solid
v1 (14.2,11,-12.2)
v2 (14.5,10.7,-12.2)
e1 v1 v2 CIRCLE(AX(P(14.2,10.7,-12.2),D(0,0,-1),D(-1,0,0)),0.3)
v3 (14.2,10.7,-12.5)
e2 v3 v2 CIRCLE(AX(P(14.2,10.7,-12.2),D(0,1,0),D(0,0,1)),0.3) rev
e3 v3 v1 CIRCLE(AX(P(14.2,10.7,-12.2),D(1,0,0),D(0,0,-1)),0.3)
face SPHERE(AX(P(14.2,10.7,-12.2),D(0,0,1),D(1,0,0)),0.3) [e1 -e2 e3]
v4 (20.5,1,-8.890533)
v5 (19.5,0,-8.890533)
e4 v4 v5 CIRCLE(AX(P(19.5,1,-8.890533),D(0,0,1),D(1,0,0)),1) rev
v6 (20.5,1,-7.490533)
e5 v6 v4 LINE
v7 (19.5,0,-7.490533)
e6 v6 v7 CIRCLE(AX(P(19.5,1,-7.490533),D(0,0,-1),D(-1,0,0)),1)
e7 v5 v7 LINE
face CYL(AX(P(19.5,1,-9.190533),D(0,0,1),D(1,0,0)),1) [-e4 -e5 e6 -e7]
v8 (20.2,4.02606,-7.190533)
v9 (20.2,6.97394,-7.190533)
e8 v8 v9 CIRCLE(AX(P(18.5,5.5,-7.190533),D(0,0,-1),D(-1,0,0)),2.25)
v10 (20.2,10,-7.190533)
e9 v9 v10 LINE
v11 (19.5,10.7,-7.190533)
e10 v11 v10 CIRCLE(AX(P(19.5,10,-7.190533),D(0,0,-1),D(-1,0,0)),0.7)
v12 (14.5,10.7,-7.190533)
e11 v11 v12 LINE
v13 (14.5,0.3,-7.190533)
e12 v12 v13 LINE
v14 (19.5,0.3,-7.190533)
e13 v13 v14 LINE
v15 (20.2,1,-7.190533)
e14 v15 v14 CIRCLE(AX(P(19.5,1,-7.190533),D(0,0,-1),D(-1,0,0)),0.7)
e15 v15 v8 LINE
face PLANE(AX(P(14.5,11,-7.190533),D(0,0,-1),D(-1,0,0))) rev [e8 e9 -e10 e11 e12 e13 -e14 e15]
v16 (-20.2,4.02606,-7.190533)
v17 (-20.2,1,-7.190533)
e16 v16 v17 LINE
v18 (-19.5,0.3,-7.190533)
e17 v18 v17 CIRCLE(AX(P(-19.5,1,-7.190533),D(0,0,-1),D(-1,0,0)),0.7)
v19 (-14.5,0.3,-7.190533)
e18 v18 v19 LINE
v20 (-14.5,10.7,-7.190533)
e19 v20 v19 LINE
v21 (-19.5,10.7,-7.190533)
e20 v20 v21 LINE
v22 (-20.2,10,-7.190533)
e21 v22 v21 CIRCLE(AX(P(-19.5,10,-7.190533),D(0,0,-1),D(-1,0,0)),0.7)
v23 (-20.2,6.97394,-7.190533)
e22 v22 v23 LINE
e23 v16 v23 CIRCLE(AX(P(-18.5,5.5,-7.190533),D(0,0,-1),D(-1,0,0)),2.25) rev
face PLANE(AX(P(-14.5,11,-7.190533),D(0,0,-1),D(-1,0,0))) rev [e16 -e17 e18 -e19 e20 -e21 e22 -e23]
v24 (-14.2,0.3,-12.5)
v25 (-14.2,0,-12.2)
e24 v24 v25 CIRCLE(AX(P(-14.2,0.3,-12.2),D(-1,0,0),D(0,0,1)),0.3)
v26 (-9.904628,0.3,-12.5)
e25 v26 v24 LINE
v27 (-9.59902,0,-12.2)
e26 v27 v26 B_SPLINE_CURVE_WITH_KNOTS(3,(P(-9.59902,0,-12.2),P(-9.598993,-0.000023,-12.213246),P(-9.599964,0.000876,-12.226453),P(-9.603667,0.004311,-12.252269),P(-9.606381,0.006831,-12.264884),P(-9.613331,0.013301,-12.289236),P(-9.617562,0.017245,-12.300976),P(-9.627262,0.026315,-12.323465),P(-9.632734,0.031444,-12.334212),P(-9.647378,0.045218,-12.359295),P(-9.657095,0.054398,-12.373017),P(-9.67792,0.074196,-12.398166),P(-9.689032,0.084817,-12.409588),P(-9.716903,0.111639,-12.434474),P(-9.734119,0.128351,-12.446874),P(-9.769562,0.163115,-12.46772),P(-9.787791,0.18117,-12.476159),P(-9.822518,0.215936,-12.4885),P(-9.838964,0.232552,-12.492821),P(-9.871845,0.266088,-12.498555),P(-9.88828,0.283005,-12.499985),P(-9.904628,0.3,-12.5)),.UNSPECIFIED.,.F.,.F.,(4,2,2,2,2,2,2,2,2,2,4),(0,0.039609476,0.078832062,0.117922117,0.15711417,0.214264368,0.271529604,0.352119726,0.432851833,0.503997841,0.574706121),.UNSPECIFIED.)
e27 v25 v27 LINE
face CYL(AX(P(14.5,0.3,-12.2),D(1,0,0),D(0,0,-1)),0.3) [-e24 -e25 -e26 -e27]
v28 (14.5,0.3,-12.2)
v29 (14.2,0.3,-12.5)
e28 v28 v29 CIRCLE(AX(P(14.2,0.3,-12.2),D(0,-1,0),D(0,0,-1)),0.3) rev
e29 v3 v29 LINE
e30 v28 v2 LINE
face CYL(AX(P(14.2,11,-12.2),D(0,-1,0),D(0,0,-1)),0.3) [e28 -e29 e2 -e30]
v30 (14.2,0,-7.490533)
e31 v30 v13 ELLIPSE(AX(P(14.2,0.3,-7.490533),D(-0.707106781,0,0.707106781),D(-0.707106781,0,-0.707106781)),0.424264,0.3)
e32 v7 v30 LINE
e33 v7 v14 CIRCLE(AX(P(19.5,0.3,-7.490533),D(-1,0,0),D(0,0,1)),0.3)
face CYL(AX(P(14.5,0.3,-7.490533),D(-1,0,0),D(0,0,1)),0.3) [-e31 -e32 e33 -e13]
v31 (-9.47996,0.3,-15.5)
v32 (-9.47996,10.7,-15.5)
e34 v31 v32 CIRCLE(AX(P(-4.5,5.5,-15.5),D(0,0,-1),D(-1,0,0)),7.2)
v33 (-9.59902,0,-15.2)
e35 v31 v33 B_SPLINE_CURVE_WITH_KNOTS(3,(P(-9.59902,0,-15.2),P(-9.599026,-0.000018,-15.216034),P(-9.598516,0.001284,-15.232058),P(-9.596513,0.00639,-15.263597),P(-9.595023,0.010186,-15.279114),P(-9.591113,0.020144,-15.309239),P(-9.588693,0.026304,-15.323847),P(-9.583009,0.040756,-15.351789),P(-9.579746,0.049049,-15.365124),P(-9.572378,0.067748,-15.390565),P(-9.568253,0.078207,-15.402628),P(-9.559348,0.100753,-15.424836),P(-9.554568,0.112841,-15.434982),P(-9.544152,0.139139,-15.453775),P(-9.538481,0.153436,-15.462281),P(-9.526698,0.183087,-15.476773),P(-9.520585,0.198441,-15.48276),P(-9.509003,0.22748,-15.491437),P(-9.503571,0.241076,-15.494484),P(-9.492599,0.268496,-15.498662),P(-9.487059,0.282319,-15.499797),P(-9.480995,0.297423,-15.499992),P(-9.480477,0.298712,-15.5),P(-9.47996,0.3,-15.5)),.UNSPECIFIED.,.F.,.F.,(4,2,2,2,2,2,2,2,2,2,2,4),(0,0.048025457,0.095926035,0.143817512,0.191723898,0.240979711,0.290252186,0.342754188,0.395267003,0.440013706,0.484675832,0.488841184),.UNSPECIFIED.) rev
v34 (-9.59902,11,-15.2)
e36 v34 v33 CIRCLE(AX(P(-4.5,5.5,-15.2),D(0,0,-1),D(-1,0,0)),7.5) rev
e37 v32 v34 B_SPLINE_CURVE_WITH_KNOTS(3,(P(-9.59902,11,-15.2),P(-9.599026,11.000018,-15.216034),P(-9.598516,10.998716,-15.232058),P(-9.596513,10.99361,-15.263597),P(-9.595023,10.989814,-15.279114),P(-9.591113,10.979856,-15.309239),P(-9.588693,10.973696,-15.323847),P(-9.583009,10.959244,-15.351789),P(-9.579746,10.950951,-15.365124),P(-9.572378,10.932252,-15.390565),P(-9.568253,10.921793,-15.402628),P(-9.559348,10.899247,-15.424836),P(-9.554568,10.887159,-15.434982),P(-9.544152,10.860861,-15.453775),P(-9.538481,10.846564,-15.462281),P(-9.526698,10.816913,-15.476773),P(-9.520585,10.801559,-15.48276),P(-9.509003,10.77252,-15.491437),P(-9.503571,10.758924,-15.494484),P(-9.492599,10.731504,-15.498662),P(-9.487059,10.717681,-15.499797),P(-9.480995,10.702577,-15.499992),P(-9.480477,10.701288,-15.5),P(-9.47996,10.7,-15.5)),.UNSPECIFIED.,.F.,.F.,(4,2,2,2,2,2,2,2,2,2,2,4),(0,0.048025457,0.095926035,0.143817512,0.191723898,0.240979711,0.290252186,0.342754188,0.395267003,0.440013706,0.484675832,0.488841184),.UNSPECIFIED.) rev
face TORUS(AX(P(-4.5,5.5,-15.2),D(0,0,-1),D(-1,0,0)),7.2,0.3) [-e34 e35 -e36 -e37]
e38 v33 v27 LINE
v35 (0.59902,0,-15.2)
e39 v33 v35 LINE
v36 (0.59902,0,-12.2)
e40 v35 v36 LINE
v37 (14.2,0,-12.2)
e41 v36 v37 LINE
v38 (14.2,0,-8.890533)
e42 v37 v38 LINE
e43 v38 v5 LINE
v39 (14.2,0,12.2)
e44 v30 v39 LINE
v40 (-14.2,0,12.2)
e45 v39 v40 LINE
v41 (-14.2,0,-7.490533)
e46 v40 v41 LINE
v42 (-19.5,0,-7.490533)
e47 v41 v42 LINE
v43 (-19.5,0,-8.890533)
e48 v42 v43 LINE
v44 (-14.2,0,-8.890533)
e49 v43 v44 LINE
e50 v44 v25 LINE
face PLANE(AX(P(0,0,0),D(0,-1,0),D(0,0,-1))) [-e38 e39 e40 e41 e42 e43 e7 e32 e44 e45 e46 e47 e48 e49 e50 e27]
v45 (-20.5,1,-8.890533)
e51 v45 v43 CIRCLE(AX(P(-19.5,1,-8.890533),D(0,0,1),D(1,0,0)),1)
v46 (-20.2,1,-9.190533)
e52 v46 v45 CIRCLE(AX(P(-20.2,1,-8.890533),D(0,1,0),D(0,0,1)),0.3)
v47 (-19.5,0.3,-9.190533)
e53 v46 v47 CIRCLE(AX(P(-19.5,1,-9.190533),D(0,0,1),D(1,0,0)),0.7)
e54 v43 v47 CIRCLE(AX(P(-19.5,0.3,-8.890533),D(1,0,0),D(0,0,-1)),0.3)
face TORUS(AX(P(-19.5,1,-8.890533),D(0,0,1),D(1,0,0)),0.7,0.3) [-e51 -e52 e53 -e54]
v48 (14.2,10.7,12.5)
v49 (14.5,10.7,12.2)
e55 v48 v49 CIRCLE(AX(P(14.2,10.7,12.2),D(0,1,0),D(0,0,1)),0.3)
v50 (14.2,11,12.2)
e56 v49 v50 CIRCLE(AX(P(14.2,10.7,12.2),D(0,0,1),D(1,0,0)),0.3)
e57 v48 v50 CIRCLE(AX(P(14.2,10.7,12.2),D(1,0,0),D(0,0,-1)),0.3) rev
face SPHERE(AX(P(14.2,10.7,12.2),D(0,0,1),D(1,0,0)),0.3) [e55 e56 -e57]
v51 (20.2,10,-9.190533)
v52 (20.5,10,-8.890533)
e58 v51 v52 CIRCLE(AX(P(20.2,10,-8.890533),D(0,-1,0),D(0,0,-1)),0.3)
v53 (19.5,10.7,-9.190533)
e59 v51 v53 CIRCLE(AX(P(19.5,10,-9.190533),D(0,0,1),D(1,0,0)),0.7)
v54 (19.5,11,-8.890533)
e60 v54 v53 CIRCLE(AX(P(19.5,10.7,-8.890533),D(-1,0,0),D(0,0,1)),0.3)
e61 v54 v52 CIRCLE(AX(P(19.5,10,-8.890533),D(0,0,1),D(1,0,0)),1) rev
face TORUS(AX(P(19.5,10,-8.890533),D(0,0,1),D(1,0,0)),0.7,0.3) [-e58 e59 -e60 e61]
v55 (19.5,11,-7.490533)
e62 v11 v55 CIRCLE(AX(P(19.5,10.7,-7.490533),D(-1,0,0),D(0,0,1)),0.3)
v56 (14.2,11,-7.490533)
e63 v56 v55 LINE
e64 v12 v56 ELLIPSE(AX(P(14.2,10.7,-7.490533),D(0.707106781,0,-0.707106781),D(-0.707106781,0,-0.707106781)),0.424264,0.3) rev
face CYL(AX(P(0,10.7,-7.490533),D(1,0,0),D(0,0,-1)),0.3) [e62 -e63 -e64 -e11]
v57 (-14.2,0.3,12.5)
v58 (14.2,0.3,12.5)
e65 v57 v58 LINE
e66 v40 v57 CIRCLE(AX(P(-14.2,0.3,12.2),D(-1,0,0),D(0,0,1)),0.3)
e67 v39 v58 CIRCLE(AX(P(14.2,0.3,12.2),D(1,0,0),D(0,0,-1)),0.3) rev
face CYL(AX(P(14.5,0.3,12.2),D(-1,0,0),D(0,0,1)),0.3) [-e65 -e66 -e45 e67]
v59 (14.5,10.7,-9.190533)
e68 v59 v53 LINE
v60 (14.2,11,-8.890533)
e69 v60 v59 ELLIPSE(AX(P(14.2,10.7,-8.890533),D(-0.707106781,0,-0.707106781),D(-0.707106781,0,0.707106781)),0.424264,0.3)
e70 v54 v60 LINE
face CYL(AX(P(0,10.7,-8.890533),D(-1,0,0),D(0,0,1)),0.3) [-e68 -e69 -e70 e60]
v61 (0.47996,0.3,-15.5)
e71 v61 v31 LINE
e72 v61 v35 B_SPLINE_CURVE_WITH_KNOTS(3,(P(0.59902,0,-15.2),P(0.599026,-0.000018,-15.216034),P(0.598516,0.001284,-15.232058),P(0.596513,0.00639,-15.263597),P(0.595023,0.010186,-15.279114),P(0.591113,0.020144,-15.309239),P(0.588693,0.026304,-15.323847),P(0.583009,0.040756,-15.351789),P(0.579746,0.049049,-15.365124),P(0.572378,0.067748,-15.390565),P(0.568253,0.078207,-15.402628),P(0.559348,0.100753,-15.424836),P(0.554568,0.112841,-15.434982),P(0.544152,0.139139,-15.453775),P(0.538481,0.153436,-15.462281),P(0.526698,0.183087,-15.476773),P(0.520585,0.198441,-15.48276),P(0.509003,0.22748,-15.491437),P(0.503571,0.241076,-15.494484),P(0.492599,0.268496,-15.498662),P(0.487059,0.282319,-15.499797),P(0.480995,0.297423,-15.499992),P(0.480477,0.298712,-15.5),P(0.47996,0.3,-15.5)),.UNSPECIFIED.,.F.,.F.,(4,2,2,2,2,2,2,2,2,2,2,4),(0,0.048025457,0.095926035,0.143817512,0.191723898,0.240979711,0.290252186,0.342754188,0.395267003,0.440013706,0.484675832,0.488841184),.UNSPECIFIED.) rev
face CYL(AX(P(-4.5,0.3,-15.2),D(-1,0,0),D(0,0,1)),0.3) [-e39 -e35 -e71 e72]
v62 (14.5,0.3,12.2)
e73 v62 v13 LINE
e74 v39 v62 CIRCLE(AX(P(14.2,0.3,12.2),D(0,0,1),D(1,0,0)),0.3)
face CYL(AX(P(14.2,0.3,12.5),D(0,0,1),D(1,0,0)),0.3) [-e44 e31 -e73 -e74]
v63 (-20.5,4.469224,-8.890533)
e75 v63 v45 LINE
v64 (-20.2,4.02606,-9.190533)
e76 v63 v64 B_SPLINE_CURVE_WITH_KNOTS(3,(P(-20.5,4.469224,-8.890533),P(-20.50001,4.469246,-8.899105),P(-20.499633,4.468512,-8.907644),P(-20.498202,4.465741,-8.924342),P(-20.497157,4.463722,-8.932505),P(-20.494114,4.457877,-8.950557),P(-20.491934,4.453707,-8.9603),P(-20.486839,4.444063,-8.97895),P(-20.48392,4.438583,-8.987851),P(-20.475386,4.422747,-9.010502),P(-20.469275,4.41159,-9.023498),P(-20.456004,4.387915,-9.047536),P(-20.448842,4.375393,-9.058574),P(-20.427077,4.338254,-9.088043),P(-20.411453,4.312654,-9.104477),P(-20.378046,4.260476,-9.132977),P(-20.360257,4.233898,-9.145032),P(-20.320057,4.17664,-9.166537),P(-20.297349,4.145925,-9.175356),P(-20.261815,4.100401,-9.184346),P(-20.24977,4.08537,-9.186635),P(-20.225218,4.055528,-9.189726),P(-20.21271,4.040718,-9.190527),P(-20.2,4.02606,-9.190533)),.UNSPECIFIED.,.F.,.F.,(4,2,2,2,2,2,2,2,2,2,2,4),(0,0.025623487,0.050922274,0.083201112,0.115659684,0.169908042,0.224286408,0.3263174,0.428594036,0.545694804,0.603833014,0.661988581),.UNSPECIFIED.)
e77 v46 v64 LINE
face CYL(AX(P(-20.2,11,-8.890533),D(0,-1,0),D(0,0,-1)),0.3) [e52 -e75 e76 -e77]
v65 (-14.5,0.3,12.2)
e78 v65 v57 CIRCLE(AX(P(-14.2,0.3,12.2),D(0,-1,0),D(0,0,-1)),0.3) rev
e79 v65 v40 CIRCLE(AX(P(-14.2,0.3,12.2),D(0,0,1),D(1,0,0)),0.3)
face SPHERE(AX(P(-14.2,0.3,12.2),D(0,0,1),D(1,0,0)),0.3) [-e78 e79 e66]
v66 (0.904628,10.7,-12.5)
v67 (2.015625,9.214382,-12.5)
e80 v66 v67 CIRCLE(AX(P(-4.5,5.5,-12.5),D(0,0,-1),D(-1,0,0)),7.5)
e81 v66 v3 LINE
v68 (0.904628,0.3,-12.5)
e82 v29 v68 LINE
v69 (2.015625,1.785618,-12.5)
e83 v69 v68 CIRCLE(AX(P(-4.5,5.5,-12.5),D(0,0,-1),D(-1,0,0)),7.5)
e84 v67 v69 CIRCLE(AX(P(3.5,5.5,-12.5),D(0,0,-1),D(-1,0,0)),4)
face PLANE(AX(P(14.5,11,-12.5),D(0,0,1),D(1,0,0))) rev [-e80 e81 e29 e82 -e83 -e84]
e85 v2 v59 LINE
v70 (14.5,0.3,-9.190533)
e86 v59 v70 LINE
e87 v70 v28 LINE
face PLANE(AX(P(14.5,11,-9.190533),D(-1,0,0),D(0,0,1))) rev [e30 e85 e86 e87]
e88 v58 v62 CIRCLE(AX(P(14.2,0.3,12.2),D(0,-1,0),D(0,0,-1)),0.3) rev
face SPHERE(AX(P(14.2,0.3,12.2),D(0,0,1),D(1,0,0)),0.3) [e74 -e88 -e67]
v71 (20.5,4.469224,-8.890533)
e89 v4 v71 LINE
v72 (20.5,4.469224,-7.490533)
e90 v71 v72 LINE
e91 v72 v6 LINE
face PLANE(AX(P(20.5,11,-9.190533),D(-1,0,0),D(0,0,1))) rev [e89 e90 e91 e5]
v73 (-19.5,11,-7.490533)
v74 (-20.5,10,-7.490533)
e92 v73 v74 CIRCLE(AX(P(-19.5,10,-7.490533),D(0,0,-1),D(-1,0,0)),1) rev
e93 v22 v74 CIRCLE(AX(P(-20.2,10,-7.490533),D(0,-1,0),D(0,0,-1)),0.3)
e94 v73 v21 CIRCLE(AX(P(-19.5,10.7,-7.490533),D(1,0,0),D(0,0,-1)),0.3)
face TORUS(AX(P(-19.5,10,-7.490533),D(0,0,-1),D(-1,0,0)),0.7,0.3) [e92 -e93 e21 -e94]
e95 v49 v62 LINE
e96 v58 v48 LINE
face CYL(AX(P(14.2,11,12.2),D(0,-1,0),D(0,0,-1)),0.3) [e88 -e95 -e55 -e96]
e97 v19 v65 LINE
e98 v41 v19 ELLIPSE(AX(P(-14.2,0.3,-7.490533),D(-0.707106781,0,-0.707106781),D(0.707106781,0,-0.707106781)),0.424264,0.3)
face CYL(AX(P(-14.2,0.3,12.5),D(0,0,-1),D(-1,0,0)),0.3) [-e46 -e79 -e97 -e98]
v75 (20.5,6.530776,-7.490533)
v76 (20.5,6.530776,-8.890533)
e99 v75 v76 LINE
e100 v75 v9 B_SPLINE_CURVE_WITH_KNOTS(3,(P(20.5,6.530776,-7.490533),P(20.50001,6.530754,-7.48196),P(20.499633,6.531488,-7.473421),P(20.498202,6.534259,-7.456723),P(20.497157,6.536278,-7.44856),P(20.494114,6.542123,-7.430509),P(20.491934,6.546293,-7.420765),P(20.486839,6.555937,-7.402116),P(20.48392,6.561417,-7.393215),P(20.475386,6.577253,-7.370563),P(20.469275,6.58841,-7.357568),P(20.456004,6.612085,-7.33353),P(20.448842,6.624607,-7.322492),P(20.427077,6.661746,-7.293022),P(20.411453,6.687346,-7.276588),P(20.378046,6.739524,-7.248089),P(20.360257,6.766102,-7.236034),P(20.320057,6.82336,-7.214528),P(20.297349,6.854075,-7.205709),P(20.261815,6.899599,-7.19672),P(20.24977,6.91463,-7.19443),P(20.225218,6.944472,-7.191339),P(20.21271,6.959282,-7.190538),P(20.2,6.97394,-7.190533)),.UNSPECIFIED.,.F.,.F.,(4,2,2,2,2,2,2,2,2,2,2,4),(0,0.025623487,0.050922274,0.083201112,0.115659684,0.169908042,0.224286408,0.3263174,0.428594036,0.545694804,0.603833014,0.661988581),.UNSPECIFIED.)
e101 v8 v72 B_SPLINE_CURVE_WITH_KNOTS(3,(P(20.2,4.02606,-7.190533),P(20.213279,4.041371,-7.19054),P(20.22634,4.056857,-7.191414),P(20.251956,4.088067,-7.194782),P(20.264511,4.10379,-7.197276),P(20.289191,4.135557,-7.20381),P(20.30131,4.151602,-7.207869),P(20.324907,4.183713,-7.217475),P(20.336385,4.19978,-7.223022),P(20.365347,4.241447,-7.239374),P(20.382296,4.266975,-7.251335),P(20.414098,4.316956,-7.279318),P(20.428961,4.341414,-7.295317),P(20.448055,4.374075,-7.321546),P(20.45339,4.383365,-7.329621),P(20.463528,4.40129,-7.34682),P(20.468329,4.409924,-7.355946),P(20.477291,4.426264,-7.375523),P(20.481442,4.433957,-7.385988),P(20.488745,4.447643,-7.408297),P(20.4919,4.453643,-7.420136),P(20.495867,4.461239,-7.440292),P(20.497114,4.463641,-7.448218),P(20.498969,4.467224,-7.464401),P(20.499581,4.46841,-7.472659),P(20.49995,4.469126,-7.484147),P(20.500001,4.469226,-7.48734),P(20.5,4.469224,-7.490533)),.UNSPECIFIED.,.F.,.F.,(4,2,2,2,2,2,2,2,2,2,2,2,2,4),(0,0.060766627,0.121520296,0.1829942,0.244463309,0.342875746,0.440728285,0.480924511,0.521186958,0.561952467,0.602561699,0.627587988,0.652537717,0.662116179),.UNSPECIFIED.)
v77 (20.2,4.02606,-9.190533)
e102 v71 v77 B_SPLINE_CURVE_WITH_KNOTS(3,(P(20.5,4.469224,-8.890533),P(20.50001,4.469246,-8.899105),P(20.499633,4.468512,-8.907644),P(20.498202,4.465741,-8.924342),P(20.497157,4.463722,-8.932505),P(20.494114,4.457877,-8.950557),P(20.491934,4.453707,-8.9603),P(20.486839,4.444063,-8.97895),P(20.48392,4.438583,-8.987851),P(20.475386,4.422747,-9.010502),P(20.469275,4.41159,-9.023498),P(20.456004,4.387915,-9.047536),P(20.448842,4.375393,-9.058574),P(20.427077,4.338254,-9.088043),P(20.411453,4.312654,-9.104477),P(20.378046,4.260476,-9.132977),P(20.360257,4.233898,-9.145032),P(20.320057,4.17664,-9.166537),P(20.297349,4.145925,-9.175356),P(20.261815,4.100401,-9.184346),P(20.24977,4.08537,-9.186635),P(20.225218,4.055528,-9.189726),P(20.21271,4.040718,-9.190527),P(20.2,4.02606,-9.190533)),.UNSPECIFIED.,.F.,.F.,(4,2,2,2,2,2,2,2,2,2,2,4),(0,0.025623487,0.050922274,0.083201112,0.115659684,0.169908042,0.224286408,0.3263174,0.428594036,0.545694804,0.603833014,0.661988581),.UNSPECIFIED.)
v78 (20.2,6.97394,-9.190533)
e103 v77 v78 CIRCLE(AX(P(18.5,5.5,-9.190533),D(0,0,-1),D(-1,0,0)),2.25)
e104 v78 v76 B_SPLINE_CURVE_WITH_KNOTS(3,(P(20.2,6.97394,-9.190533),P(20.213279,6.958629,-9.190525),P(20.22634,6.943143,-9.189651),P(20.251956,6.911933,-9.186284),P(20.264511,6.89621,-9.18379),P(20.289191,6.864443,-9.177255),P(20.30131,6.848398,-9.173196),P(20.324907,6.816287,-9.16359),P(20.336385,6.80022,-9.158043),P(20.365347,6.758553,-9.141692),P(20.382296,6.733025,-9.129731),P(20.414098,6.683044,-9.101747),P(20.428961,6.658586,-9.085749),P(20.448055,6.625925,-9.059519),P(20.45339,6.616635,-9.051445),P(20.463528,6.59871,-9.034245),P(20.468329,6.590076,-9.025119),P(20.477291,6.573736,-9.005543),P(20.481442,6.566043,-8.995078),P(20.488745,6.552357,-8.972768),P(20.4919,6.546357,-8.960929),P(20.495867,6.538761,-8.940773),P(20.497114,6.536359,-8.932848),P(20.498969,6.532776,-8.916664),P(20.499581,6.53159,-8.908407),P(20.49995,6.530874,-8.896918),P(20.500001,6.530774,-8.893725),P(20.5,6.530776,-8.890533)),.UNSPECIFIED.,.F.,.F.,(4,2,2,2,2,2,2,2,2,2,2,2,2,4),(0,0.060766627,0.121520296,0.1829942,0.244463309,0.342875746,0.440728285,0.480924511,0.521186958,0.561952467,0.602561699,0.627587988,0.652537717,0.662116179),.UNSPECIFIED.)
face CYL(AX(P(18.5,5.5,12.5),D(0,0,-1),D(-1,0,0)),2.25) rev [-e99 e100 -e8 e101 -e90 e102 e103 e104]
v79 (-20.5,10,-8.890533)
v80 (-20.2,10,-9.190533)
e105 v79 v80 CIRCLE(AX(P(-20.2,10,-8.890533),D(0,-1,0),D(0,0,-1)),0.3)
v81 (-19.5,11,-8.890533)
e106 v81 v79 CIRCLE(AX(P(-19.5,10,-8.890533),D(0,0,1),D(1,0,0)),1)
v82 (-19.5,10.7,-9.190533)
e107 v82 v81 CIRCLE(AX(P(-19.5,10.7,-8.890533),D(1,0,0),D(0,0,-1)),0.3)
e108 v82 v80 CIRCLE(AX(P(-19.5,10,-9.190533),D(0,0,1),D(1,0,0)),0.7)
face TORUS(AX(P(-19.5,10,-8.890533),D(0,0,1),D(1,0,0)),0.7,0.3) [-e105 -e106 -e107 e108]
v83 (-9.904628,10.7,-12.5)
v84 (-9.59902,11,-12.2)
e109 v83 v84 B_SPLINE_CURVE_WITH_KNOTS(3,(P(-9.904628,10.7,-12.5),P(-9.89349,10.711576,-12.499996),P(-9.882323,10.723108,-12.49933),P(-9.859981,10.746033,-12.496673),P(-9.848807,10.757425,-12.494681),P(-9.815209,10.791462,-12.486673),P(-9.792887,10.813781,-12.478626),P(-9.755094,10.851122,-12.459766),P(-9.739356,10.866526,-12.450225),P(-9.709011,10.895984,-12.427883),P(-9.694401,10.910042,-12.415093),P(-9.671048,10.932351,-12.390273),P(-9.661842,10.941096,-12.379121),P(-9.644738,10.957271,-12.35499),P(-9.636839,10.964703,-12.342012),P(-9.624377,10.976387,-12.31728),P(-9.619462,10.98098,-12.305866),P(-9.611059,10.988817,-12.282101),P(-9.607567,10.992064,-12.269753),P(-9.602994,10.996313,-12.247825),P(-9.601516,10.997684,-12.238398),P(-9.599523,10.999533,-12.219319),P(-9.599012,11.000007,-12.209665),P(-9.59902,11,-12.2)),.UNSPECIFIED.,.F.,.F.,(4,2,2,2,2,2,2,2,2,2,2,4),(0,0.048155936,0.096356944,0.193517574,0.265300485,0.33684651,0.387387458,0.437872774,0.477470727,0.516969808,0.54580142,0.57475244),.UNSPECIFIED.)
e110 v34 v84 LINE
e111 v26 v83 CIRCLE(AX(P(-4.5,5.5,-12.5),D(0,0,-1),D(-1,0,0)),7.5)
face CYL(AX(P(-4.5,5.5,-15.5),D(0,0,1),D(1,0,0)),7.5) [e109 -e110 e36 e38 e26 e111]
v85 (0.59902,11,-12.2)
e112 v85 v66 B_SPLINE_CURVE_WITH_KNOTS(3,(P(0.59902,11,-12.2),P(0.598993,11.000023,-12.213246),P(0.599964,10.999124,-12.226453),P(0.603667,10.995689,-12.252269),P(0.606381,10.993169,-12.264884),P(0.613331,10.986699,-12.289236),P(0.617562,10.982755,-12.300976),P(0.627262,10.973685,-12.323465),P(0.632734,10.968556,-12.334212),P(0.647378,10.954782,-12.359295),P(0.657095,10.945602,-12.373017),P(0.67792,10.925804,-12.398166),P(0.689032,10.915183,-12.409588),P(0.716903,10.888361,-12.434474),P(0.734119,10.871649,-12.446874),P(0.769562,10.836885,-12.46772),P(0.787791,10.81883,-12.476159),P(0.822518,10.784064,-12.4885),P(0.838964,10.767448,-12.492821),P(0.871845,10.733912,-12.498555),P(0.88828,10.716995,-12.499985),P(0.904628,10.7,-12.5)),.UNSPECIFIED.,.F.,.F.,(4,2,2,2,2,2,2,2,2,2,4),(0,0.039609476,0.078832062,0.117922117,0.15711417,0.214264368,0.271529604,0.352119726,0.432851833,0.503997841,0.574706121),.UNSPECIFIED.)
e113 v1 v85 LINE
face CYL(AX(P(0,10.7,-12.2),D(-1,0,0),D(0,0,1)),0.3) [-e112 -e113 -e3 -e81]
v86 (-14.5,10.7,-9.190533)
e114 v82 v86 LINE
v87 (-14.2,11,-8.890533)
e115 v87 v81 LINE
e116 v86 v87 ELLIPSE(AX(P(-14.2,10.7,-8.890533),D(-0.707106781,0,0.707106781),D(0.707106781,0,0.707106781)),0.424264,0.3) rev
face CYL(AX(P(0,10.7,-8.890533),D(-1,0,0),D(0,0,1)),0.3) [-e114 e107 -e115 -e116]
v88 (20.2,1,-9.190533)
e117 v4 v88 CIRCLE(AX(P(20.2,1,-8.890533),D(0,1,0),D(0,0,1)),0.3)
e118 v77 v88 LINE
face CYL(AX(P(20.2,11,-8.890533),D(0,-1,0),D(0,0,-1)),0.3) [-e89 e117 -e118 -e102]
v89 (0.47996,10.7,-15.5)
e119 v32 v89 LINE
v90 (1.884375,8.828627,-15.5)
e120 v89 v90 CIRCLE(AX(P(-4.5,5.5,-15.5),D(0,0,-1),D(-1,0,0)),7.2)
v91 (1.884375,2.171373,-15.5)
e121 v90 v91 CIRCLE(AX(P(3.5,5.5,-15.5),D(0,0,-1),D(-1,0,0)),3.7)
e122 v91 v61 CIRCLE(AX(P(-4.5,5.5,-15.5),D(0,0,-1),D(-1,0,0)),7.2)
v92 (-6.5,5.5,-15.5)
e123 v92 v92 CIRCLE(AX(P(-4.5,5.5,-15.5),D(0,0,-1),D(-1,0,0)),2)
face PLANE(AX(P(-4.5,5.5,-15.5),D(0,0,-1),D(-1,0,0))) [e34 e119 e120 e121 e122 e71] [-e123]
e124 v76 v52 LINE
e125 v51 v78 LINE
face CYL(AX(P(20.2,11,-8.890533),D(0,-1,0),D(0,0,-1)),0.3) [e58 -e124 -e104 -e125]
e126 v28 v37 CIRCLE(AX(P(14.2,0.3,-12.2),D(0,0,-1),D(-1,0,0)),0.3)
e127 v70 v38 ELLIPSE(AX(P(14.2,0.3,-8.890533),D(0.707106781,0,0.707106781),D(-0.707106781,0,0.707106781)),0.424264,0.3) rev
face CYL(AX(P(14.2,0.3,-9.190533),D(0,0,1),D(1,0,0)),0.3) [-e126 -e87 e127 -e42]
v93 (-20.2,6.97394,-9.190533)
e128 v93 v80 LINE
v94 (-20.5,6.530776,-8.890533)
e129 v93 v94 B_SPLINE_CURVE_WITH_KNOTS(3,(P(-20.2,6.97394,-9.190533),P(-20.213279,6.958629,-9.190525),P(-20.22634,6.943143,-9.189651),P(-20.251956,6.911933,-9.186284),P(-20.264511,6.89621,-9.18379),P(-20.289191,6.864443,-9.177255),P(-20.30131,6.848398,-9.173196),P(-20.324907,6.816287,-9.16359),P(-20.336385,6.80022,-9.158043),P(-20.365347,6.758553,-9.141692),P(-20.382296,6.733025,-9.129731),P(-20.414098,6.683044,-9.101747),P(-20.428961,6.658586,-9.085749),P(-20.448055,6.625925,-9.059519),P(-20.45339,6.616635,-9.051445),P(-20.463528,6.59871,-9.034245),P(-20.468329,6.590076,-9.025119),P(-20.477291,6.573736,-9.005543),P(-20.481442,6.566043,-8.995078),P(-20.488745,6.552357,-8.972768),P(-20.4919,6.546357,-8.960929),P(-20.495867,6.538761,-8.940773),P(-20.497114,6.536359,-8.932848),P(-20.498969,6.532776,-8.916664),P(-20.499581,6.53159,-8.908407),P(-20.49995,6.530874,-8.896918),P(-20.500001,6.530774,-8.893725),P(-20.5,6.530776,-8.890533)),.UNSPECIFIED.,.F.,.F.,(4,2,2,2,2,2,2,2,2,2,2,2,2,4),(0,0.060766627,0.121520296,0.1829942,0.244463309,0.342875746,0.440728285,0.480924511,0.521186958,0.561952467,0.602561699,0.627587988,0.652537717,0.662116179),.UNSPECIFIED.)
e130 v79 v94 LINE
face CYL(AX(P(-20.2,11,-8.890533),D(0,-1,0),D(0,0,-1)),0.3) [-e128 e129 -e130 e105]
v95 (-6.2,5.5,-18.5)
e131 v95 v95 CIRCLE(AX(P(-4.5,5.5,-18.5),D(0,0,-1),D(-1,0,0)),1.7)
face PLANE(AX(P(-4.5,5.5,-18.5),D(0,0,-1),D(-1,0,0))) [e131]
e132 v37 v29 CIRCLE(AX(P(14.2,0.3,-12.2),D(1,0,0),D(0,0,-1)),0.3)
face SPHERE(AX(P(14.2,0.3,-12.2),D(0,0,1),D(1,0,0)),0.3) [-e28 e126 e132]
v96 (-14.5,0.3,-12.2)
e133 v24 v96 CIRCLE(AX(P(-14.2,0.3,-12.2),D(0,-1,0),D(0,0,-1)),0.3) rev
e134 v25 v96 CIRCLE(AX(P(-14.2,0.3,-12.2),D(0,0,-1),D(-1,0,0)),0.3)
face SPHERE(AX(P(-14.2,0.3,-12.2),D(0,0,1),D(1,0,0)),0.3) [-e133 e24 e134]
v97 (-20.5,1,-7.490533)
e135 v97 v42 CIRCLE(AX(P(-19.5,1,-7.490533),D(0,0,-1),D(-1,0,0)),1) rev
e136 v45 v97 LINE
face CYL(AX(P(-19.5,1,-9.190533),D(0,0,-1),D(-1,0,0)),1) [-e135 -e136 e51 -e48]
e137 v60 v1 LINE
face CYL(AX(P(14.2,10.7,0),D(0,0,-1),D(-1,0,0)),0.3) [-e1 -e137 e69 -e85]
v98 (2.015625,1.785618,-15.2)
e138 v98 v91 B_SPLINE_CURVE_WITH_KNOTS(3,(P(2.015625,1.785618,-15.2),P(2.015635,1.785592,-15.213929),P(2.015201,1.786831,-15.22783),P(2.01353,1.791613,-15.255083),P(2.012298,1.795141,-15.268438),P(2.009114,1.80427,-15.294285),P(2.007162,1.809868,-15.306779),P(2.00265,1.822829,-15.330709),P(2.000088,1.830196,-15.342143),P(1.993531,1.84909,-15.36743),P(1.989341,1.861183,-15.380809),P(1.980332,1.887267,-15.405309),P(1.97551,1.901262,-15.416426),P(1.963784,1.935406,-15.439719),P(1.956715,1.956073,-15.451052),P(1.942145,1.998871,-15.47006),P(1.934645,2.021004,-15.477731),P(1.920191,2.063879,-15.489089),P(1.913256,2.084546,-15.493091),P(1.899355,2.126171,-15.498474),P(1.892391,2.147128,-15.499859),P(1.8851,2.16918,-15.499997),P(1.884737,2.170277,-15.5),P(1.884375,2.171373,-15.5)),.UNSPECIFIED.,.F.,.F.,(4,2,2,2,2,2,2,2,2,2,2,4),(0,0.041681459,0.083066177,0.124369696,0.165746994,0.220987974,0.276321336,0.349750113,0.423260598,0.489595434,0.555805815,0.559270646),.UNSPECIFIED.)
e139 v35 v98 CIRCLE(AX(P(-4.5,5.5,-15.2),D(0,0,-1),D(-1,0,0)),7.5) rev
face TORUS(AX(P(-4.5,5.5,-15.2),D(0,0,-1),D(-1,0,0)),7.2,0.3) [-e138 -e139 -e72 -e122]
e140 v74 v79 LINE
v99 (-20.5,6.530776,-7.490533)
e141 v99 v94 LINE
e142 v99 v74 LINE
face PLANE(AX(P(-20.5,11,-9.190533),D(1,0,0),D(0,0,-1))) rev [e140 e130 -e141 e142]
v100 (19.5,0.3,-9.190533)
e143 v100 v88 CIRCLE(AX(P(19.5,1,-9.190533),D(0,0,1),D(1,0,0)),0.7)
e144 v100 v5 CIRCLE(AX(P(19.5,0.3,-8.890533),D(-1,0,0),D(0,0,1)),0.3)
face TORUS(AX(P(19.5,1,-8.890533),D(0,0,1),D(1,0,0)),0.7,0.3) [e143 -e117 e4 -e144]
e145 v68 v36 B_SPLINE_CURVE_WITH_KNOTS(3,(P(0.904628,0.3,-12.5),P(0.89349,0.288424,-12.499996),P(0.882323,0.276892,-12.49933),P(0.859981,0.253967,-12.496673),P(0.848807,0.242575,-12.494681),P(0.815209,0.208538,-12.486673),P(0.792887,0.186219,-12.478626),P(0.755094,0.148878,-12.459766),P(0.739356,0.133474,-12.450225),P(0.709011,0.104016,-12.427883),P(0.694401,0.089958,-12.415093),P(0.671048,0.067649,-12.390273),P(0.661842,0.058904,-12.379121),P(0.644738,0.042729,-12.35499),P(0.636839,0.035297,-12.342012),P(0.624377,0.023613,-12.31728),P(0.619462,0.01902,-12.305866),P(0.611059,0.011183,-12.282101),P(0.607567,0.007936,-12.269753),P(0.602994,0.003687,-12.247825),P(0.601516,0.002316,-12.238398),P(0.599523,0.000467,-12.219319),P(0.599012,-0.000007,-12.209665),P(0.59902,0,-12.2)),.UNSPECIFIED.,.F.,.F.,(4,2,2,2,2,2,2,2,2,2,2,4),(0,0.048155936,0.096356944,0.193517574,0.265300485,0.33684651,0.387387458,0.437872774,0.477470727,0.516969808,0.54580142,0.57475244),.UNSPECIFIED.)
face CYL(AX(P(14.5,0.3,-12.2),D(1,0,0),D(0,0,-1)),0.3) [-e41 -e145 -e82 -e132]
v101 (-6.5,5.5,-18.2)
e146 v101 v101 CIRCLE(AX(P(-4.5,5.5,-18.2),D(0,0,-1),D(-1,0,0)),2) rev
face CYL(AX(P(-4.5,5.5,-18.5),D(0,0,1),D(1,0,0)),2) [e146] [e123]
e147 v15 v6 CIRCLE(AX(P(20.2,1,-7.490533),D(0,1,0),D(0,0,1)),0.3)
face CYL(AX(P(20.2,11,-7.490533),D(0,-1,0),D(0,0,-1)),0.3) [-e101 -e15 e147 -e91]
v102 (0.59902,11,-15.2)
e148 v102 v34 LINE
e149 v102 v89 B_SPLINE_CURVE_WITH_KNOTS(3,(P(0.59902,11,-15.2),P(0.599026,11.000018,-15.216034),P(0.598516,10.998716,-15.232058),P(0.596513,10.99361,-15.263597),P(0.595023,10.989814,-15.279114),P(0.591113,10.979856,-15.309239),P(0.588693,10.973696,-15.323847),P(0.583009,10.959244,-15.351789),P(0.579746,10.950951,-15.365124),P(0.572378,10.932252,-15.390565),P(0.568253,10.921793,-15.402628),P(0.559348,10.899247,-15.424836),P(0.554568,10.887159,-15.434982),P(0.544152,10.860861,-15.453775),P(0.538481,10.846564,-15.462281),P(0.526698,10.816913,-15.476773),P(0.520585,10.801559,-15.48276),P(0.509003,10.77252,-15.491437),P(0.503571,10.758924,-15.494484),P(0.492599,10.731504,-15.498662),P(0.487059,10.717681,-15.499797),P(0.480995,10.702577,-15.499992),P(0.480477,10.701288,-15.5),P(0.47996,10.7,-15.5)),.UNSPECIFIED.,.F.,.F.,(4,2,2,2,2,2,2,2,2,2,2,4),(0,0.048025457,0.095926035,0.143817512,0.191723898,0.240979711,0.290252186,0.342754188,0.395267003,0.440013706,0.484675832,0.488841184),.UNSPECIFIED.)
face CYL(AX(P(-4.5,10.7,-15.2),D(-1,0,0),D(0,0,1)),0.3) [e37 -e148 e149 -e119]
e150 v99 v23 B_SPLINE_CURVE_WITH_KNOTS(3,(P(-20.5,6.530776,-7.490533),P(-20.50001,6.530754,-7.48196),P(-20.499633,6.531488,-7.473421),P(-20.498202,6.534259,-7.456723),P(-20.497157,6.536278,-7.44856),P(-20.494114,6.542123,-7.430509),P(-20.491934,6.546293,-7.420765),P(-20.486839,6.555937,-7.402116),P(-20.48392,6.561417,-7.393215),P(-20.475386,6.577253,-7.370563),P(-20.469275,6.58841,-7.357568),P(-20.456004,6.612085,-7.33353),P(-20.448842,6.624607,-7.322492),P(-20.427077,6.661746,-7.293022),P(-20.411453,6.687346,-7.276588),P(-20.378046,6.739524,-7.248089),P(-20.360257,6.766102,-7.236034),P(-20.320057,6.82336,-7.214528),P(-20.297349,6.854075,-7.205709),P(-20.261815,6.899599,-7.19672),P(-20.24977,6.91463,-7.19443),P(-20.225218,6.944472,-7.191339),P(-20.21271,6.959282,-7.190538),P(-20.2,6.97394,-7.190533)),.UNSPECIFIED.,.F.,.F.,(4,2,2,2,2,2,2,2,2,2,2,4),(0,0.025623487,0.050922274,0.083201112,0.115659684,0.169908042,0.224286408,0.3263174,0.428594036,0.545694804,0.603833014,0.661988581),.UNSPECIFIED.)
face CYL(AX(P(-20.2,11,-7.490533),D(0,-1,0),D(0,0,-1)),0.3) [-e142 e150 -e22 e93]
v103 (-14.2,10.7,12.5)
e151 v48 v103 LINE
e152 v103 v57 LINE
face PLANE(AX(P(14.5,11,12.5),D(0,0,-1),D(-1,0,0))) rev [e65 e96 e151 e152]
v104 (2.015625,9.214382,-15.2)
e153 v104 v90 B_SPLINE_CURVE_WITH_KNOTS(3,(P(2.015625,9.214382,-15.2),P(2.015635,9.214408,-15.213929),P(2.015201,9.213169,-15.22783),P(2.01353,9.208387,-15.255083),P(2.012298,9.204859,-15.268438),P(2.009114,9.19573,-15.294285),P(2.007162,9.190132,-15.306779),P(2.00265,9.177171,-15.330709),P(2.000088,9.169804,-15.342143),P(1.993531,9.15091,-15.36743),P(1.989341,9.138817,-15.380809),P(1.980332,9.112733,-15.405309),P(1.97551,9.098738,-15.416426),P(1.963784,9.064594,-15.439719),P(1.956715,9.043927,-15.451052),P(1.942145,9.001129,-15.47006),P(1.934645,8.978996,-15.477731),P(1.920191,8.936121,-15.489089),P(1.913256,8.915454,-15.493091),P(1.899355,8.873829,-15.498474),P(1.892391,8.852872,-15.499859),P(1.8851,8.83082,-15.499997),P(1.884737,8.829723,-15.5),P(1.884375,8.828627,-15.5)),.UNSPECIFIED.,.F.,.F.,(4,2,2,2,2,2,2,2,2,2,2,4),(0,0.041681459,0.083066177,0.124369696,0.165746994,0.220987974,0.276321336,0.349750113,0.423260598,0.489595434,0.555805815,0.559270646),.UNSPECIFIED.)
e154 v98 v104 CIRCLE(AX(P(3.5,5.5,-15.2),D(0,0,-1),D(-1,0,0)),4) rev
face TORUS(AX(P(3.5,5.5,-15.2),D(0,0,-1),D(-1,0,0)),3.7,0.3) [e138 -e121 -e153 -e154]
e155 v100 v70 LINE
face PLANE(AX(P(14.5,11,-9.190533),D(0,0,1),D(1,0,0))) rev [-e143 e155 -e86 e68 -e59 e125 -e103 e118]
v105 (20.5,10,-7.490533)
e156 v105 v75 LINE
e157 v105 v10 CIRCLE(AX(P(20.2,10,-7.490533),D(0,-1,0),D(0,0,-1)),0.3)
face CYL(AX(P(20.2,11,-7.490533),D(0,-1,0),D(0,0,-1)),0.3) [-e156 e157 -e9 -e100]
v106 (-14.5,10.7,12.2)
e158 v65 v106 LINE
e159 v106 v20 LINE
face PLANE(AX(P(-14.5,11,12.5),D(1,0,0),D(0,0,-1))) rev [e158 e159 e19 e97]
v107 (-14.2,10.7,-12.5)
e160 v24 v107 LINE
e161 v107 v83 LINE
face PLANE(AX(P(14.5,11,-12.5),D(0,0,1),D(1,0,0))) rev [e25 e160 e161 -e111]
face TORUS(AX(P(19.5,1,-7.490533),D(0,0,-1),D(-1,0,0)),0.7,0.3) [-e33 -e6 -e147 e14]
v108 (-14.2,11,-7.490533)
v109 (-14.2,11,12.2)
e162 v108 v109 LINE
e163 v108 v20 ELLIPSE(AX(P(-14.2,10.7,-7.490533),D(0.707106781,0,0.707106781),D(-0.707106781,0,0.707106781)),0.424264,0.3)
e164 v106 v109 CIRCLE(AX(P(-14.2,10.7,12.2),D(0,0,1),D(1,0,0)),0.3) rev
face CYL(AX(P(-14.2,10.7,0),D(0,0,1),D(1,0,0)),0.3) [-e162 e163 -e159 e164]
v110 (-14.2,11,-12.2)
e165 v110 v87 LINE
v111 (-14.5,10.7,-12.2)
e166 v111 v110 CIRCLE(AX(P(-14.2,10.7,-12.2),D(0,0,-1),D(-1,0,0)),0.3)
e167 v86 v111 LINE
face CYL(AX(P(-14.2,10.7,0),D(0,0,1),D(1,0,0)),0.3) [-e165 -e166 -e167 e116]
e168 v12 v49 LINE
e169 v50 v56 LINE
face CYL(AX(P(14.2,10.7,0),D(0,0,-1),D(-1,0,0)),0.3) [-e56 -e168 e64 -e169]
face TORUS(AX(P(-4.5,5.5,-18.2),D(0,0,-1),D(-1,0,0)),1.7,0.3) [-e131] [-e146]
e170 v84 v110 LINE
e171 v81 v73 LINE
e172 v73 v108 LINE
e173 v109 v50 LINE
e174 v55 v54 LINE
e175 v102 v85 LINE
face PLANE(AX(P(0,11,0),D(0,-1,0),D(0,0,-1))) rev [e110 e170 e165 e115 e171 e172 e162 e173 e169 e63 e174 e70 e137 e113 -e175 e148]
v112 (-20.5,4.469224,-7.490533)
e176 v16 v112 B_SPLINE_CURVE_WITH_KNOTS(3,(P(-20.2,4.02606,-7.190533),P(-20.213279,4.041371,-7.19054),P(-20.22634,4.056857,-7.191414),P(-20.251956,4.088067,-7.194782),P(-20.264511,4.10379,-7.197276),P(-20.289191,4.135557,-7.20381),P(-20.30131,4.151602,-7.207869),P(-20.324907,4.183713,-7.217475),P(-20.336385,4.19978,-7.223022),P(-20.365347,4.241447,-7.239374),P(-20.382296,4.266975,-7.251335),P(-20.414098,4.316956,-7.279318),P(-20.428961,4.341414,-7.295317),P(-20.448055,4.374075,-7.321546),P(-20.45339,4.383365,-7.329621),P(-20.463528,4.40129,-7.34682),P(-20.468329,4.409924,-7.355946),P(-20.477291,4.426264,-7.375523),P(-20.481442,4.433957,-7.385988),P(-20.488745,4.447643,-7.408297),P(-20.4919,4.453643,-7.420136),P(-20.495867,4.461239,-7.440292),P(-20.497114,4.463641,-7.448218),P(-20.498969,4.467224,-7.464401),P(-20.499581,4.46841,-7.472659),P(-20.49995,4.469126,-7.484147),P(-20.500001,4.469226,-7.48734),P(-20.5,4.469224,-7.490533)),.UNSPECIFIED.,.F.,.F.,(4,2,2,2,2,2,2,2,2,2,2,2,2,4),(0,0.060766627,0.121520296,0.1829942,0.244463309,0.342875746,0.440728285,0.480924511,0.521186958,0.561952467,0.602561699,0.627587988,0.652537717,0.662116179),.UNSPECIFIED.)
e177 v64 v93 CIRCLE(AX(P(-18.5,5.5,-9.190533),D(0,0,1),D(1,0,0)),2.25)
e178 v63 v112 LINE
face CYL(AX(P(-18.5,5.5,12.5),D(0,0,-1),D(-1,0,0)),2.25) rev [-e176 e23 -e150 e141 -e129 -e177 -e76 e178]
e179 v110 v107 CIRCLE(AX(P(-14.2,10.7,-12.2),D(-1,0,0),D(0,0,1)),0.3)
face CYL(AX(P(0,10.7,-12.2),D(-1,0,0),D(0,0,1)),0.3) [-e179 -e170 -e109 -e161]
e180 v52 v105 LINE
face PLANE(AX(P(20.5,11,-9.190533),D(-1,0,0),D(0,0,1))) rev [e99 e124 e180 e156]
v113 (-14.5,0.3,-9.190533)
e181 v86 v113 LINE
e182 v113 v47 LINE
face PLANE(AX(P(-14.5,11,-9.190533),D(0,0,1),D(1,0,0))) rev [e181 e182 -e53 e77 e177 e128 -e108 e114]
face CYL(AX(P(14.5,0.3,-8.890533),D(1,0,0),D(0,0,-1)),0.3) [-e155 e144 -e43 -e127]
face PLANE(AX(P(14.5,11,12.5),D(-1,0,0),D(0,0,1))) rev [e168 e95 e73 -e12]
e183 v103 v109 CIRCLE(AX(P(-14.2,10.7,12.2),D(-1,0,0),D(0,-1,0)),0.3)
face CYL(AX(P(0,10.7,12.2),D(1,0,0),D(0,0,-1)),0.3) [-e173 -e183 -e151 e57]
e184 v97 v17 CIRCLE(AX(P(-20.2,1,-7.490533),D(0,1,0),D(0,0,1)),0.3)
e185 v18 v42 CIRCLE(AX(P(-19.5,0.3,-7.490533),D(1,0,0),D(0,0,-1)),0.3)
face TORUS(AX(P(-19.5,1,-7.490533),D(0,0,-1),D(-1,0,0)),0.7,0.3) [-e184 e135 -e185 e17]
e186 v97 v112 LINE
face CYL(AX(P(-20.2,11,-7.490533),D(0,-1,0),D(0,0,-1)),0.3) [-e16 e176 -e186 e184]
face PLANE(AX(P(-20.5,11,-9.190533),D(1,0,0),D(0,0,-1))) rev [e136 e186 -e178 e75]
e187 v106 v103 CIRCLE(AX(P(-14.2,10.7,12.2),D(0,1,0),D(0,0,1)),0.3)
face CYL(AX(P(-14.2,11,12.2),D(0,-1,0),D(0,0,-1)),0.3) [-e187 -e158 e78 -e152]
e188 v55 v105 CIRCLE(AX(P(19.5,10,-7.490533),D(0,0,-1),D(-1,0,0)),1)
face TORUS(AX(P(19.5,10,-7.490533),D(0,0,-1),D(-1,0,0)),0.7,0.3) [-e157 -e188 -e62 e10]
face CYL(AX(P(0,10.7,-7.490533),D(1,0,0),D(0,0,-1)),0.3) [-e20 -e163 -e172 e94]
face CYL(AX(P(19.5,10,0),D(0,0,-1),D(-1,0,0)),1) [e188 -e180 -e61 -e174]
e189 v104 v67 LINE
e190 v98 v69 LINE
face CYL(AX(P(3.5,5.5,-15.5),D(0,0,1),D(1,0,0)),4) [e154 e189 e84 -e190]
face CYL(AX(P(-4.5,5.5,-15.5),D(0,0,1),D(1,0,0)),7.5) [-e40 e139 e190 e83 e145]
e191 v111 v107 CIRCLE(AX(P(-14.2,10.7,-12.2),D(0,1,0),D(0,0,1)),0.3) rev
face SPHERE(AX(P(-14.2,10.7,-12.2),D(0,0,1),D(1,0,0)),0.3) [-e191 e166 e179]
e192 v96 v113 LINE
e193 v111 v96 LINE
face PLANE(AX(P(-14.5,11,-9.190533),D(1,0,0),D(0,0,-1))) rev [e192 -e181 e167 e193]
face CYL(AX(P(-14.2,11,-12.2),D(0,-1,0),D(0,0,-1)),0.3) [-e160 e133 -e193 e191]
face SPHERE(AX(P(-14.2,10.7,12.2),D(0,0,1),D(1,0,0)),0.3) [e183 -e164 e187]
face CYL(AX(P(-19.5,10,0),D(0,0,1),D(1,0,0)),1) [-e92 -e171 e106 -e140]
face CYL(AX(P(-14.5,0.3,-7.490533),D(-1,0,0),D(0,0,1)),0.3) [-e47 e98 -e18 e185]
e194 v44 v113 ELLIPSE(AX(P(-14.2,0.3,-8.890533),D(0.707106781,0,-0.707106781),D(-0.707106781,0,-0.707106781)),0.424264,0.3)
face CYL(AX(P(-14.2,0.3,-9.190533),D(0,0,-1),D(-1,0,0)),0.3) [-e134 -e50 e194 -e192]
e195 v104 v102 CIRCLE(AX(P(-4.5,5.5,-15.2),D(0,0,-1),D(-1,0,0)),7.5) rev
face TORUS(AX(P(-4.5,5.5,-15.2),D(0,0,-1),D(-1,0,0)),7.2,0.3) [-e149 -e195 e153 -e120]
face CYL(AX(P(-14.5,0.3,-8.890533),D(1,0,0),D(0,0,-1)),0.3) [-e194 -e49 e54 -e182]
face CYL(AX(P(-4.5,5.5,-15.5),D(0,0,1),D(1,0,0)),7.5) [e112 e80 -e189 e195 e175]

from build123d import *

# Parameters (mm, degrees)
BOSS_EXTRUDE1_DEPTH = 11
BOSS_EXTRUDE2_DEPTH = 3
SKETCH3_R           = 2
BOSS_EXTRUDE3_DEPTH = 3
FILLET2_R           = 0.3
FILLET3_R           = 1
SKETCH4_R           = 2.25
CUT_EXTRUDE1_DEPTH  = 32.80769114


with BuildPart() as part:
    # Sketch1 → Boss-Extrude1 (new body)
    with BuildSketch(Plane(origin=(0, 0, 0), x_dir=(1, 0, 0), z_dir=(0, 1, 0))):
        Polygon((-14.5, 9.190532713), (-14.5, 12.5), (14.5, 12.5), (14.5, 9.190532713), (20.5, 9.190532713), (20.5, 7.190532713), (14.5, 7.190532713), (14.5, -12.5), (-14.5, -12.5), (-14.5, 7.190532713), (-20.5, 7.190532713), (-20.5, 9.190532713), align=None)
    extrude(amount=BOSS_EXTRUDE1_DEPTH)

    # Sketch2 → Boss-Extrude2 (add)
    with BuildSketch(Plane(origin=(0, 0, -12.5), x_dir=(-1, 0, 0), z_dir=(0, 0, -1))):
        with BuildLine():
            Line((-0.599019514, 11), (9.599019514, 11))
            ThreePointArc((9.599019514, 11), (12, 5.5), (9.599019514, 0))
            Line((9.599019514, 0), (-0.599019514, 0))
            ThreePointArc((-0.599019514, 0), (-1.375551041, 0.838680449), (-2.015625, 1.785618375))
            ThreePointArc((-2.015625, 1.785618375), (-7.5, 5.5), (-2.015625, 9.214381625))
            ThreePointArc((-2.015625, 9.214381625), (-1.375551041, 10.161319551), (-0.599019514, 11))
        make_face()
    extrude(amount=BOSS_EXTRUDE2_DEPTH)

    # Sketch3 → Boss-Extrude3 (add)
    with BuildSketch(Plane(origin=(0, 0, -15.5), x_dir=(-1, 0, 0), z_dir=(0, 0, -1))):
        with Locations((4.5, 5.5)):
            Circle(SKETCH3_R)
    extrude(amount=BOSS_EXTRUDE3_DEPTH)

    # Fillet2
    fillet2_edges = [part.edges().sort_by_distance(p)[0] for p in [
        (-14.5, 5.5, -12.5),
        (14.5, 5.5, -12.5),
        (-20.5, 5.5, -9.190532713),
        (-4.5, 11, -15.5),
        (-12.049509757, 11, -12.5),
        (-14.5, 11, -10.845266356),
        (-17.5, 11, -9.190532713),
        (-14.5, 11, 2.654733644),
        (14.5, 11, 2.654733644),
        (20.5, 5.5, -9.190532713),
        (17.5, 11, -9.190532713),
        (14.5, 11, -10.845266356),
        (1.375551041, 10.161319551, -15.5),
        (7.549509757, 11, -12.5),
        (20.5, 5.5, -7.190532713),
        (-20.5, 5.5, -7.190532713),
        (-17.5, 11, -7.190532713),
        (17.5, 11, -7.190532713),
        (14.5, 5.5, 12.5),
        (0, 11, 12.5),
        (-14.5, 5.5, 12.5),
        (-14.5, 0, 2.654733644),
        (-17.5, 0, -7.190532713),
        (-14.5, 0, -10.845266356),
        (-17.5, 0, -9.190532713),
        (-2.5, 5.5, -18.5),
        (-12, 5.5, -15.5),
        (7.5, 5.5, -15.5),
        (1.375551041, 0.838680449, -15.5),
        (-4.5, 0, -15.5),
        (-12.049509757, 0, -12.5),
        (7.549509757, 0, -12.5),
        (14.5, 0, -10.845266356),
        (17.5, 0, -9.190532713),
        (17.5, 0, -7.190532713),
        (14.5, 0, 2.654733644),
        (0, 0, 12.5),
    ]]
    fillet(fillet2_edges, radius=FILLET2_R)

    # Fillet3
    # the kernel refuses this fillet: 1 mm, written as the material it takes off along each edge
    with BuildSketch(Plane(origin=(-19.5, 10, -9.190532713), x_dir=(-1, 0, 0), z_dir=(0, -1, 0))) as fillet3_piece_1:
        with BuildLine():
            CenterArc((0.7, -0.3), 0.3, 0, 90)
            Line((1, -0.3), (1, 0))
            Line((1, 0), (0.7, 0))
        make_face()
    revolve(axis=Axis((-19.5, 10, -9.190532713), (0, 0, -1)), revolution_arc=90, mode=Mode.SUBTRACT)
    with BuildSketch(Plane(origin=(-19.5, 1, -9.190532713), x_dir=(0, -1, 0), z_dir=(1, 0, 0))) as fillet3_piece_2:
        with BuildLine():
            CenterArc((0.7, -0.3), 0.3, 0, 90)
            Line((1, -0.3), (1, 0))
            Line((1, 0), (0.7, 0))
        make_face()
    revolve(axis=Axis((-19.5, 1, -9.190532713), (0, 0, -1)), revolution_arc=90, mode=Mode.SUBTRACT)
    with BuildSketch(Plane(origin=(19.5, 10, -9.190532713), x_dir=(0, 1, 0), z_dir=(-1, 0, 0))) as fillet3_piece_3:
        with BuildLine():
            CenterArc((0.7, -0.3), 0.3, 0, 90)
            Line((1, -0.3), (1, 0))
            Line((1, 0), (0.7, 0))
        make_face()
    revolve(axis=Axis((19.5, 10, -9.190532713), (0, 0, -1)), revolution_arc=90, mode=Mode.SUBTRACT)
    with BuildSketch(Plane(origin=(19.5, 1, -9.190532713), x_dir=(1, 0, 0), z_dir=(0, 1, 0))) as fillet3_piece_4:
        with BuildLine():
            CenterArc((0.7, -0.3), 0.3, 0, 90)
            Line((1, -0.3), (1, 0))
            Line((1, 0), (0.7, 0))
        make_face()
    revolve(axis=Axis((19.5, 1, -9.190532713), (0, 0, -1)), revolution_arc=90, mode=Mode.SUBTRACT)
    with BuildSketch(Plane(origin=(19.5, 1, -7.190532713), x_dir=(0, -1, 0), z_dir=(-1, 0, 0))) as fillet3_piece_5:
        with BuildLine():
            CenterArc((0.7, -0.3), 0.3, 0, 90)
            Line((1, -0.3), (1, 0))
            Line((1, 0), (0.7, 0))
        make_face()
    revolve(axis=Axis((19.5, 1, -7.190532713), (0, 0, 1)), revolution_arc=90, mode=Mode.SUBTRACT)
    with BuildSketch(Plane(origin=(19.5, 10, -7.190532713), x_dir=(1, 0, 0), z_dir=(0, -1, 0))) as fillet3_piece_6:
        with BuildLine():
            CenterArc((0.7, -0.3), 0.3, 0, 90)
            Line((1, -0.3), (1, 0))
            Line((1, 0), (0.7, 0))
        make_face()
    revolve(axis=Axis((19.5, 10, -7.190532713), (0, 0, 1)), revolution_arc=90, mode=Mode.SUBTRACT)
    with BuildSketch(Plane(origin=(-19.5, 1, -7.190532713), x_dir=(-1, 0, 0), z_dir=(0, 1, 0))) as fillet3_piece_7:
        with BuildLine():
            CenterArc((0.7, -0.3), 0.3, 0, 90)
            Line((1, -0.3), (1, 0))
            Line((1, 0), (0.7, 0))
        make_face()
    revolve(axis=Axis((-19.5, 1, -7.190532713), (0, 0, 1)), revolution_arc=90, mode=Mode.SUBTRACT)
    with BuildSketch(Plane(origin=(-19.5, 10, -7.190532713), x_dir=(0, 1, 0), z_dir=(1, 0, 0))) as fillet3_piece_8:
        with BuildLine():
            CenterArc((0.7, -0.3), 0.3, 0, 90)
            Line((1, -0.3), (1, 0))
            Line((1, 0), (0.7, 0))
        make_face()
    revolve(axis=Axis((-19.5, 10, -7.190532713), (0, 0, 1)), revolution_arc=90, mode=Mode.SUBTRACT)
    with BuildSketch(Plane(origin=(-20.5, 0, -7.190532713), x_dir=(1, 0, 0), z_dir=(0, 0, -1)), Plane(origin=(20.5, 0, -9.190532713), x_dir=(-1, 0, 0), z_dir=(0, 0, 1))) as fillet3_piece_9:
        with BuildLine():
            CenterArc((FILLET3_R, -FILLET3_R), FILLET3_R, 90, 90)
            Line((0, -FILLET3_R), (0, 0))
            Line((0, 0), (FILLET3_R, 0))
        make_face()
    extrude(amount=2, mode=Mode.SUBTRACT)
    with BuildSketch(Plane(origin=(-20.5, 11, -7.190532713), x_dir=(1, 0, 0), z_dir=(0, 0, -1)), Plane(origin=(20.5, 11, -9.190532713), x_dir=(-1, 0, 0), z_dir=(0, 0, 1))) as fillet3_piece_10:
        with BuildLine():
            CenterArc((FILLET3_R, FILLET3_R), FILLET3_R, 180, 90)
            Line((0, FILLET3_R), (0, 0))
            Line((0, 0), (FILLET3_R, 0))
        make_face()
    extrude(amount=2, mode=Mode.SUBTRACT)

    # Sketch4 → Cut-Extrude1 (cut, through all)
    with BuildSketch(Plane(origin=(0, 0, -9.190532713), x_dir=(-1, 0, 0), z_dir=(0, 0, -1))):
        with Locations((-18.5, 5.5)):
            Circle(SKETCH4_R)
    cut_extrude1 = extrude(amount=-CUT_EXTRUDE1_DEPTH, mode=Mode.SUBTRACT)

    # Mirror1: Cut-Extrude1 across plane
    add(cut_extrude1.mirror(Plane(origin=(0, 0, 0), x_dir=(0, 0, 1), z_dir=(1, 0, 0))), mode=Mode.SUBTRACT)


solid = part.part
